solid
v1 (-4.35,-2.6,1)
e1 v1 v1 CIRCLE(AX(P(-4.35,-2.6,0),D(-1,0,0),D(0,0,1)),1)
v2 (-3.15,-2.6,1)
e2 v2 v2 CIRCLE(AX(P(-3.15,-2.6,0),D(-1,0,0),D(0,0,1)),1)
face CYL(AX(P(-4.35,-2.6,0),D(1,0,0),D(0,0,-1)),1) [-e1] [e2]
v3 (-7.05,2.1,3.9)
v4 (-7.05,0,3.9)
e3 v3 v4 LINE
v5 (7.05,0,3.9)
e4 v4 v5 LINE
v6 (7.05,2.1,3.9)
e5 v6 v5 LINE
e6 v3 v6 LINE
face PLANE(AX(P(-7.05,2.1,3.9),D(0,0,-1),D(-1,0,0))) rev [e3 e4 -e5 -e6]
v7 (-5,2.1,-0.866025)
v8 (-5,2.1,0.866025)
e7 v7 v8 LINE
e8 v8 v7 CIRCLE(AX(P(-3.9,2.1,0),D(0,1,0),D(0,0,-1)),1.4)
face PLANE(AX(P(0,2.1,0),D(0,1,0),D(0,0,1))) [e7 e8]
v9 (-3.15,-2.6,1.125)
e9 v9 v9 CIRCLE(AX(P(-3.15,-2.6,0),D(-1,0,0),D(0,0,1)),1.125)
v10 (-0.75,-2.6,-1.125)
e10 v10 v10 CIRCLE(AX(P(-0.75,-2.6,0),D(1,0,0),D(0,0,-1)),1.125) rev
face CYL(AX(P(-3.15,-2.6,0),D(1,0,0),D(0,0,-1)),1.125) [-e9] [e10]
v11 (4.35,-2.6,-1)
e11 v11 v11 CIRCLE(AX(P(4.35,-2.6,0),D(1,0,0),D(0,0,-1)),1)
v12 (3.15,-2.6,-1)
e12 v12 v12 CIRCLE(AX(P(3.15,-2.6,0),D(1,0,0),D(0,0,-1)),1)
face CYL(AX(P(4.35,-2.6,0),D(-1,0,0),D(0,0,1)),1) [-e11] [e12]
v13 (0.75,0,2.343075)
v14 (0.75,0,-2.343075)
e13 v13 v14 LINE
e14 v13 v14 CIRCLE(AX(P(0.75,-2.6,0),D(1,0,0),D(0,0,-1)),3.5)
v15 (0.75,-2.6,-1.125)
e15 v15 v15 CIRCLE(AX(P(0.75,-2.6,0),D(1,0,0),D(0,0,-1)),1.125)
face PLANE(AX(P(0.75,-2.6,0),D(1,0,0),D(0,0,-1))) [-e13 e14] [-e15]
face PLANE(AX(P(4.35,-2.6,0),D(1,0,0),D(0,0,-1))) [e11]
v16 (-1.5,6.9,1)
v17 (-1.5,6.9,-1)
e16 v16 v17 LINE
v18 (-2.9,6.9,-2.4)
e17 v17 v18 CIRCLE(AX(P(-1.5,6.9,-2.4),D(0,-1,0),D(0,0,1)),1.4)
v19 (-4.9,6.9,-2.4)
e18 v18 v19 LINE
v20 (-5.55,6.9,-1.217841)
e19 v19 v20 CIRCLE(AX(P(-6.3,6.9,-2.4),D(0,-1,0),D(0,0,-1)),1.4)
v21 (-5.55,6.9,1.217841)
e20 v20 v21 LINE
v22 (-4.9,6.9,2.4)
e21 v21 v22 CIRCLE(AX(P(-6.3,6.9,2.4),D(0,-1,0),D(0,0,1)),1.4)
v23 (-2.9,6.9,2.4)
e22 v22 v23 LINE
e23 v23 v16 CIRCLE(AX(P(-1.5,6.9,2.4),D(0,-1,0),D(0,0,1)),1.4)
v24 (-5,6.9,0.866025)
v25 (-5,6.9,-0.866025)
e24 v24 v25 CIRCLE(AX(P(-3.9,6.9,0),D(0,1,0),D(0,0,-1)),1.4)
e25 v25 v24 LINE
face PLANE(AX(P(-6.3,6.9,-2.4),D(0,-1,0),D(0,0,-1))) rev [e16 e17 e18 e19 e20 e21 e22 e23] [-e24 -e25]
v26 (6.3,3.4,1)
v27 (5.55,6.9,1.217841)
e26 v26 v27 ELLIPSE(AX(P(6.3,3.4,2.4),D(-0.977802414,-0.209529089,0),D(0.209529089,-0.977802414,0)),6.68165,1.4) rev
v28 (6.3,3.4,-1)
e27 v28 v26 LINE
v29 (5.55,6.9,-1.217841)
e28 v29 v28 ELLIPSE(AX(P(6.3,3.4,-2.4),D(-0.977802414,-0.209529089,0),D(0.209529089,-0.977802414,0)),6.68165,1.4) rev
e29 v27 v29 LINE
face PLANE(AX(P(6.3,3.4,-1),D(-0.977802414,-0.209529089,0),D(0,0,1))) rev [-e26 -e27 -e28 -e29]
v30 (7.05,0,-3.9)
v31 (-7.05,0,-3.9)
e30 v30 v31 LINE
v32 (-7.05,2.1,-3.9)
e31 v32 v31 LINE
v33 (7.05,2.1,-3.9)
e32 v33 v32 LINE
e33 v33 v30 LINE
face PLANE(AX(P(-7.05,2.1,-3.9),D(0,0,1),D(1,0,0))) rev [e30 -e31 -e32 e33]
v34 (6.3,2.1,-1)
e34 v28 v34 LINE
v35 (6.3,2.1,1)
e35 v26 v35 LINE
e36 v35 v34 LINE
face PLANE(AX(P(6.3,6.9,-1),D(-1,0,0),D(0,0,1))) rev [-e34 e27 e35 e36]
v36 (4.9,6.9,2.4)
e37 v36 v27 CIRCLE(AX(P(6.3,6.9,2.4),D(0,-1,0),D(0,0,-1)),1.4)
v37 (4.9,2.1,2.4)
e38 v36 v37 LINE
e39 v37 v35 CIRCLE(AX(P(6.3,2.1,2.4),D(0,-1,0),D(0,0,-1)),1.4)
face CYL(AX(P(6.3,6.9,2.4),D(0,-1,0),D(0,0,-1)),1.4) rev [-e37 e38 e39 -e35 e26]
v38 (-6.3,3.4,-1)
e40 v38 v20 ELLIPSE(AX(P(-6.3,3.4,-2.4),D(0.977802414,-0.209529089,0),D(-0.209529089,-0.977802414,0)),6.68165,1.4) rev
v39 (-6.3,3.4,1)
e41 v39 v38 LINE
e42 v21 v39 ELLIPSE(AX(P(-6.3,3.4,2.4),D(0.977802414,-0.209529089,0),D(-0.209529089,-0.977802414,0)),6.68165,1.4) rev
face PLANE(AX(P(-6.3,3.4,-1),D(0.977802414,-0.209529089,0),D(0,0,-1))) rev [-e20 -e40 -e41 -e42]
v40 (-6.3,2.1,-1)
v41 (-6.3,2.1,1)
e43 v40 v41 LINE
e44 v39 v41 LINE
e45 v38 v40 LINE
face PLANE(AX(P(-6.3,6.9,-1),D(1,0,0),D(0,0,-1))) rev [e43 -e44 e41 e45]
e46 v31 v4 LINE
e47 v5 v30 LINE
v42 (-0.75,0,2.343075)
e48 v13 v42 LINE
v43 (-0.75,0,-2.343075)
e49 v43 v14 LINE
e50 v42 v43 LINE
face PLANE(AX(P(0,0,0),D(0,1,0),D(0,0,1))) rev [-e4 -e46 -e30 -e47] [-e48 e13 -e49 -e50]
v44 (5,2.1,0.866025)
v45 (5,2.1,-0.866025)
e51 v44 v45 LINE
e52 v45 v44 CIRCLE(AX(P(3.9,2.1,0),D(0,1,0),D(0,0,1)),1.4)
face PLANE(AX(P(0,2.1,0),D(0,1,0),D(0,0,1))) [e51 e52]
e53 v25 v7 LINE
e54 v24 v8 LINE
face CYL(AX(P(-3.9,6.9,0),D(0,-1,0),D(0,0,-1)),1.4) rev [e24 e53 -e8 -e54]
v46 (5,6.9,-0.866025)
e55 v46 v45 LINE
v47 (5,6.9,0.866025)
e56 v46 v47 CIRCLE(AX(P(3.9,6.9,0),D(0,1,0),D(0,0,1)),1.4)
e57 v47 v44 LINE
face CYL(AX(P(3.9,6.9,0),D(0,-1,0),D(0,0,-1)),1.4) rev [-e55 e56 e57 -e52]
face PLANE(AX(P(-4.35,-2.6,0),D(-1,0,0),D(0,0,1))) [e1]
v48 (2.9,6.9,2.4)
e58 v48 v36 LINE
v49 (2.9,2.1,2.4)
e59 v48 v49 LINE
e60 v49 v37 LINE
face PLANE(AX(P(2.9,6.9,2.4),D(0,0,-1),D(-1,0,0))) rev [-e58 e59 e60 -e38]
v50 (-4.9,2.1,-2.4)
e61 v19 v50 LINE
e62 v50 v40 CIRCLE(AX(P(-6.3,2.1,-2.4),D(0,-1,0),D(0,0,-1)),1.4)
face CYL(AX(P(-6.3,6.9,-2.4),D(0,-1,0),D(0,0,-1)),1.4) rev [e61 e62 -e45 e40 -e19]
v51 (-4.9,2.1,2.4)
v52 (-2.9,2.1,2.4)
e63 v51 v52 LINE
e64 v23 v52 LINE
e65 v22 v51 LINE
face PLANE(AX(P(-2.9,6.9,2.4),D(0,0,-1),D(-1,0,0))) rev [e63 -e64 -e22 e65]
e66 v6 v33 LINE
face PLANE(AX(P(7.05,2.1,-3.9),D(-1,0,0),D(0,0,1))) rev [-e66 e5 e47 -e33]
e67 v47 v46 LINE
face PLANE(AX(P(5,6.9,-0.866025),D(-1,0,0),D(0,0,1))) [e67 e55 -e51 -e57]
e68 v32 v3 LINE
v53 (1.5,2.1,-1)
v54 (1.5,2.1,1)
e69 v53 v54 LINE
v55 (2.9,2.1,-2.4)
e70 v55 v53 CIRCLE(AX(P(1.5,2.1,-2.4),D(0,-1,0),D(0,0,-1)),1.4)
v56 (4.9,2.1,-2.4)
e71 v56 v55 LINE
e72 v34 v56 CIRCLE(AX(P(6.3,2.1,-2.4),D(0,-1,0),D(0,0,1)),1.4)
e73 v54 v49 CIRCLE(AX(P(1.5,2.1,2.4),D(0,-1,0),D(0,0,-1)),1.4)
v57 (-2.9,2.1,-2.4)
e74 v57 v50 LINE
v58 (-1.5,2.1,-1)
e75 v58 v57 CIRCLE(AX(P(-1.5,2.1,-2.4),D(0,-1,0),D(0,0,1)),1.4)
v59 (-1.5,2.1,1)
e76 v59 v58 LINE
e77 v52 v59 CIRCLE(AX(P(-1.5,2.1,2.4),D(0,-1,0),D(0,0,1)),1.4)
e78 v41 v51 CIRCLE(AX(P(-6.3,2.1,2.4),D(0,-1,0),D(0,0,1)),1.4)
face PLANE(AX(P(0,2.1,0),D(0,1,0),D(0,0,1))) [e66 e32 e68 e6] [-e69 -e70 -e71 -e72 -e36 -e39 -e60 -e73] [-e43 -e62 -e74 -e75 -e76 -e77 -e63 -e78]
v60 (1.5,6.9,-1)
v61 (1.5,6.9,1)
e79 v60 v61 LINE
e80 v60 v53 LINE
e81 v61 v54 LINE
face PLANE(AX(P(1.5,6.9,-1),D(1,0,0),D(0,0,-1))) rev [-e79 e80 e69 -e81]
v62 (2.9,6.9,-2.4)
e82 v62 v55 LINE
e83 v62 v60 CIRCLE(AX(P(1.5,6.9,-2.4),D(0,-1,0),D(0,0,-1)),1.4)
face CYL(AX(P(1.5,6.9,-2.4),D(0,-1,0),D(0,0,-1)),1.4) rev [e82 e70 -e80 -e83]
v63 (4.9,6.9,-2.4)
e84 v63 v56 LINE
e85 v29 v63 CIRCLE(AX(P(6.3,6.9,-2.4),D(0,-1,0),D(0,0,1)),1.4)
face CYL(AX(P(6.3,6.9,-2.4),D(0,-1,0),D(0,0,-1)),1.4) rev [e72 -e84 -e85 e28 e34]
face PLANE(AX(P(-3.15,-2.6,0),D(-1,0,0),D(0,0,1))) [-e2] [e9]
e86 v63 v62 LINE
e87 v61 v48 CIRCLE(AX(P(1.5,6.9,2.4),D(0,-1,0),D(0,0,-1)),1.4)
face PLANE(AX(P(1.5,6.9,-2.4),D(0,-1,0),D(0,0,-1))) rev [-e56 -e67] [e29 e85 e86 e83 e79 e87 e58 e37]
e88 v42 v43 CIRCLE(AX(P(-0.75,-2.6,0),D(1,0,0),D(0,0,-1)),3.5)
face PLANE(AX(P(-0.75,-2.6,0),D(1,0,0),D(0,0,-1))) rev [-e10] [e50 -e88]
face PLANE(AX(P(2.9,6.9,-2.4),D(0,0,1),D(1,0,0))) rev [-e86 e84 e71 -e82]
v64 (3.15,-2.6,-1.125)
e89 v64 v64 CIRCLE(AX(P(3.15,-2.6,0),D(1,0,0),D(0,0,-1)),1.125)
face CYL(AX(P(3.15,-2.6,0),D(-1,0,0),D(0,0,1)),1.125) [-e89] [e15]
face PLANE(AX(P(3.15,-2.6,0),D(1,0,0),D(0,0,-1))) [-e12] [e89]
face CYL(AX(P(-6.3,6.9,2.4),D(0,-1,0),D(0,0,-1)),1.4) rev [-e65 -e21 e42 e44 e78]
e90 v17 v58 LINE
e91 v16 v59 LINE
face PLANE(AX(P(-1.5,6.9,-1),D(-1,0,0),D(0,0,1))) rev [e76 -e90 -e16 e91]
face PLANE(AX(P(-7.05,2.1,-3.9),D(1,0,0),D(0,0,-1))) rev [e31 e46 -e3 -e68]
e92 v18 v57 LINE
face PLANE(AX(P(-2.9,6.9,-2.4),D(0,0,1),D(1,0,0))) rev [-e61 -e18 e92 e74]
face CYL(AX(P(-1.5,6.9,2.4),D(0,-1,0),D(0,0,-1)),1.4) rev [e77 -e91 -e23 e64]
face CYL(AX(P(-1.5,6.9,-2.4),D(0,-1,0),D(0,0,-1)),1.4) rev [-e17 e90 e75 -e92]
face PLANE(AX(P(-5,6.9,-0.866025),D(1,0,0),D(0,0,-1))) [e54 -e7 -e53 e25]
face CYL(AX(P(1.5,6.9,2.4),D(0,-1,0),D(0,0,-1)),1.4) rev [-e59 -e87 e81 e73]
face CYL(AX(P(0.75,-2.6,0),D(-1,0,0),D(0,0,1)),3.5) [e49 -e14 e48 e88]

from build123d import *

# Parameters (mm, degrees)
SKETCH1_W           = 14.1
SKETCH1_H           = 7.8
BOSS_EXTRUDE3_DEPTH = 2.1
BOSS_EXTRUDE4_DEPTH = 4.8
CHAMFER1_START      = 6.87255411
CHAMFER1_OUTLINE_W  = 6
CHAMFER1_OUTLINE_H  = 6
CHAMFER1_DEPTH      = 2.12744589
CHAMFER2_START      = -9
CHAMFER2_OUTLINE_W  = 6
CHAMFER2_OUTLINE_H  = 6
CHAMFER2_DEPTH      = 2.12744589
SKETCH6_R           = 3.5
BOSS_EXTRUDE5_DEPTH = 0.75
SKETCH7_R           = 1.125
BOSS_EXTRUDE6_DEPTH = 2.4
BOSS_EXTRUDE7_START = 2.4
SKETCH9_R           = 1.125
BOSS_EXTRUDE7_DEPTH = 2.4
SKETCH10_R          = 1
BOSS_EXTRUDE8_DEPTH = 1.2
BOSS_EXTRUDE9_START = 1.2
SKETCH11_R          = 1
BOSS_EXTRUDE9_DEPTH = 1.2


with BuildPart() as part:
    # Sketch1 → Boss-Extrude3 (new body)
    with BuildSketch(Plane(origin=(0, 0, 0), x_dir=(1, 0, 0), z_dir=(0, 1, 0))):
        Rectangle(SKETCH1_W, SKETCH1_H)
    extrude(amount=BOSS_EXTRUDE3_DEPTH)

    # Sketch3 → Boss-Extrude4 (add)
    # profile 1 of 2: a face of its own
    with BuildSketch(Plane(origin=(0, 2.1, 0), x_dir=(1, 0, 0), z_dir=(0, 1, 0))):
        with BuildLine():
            Line((2.9, 2.4), (4.9, 2.4))
            ThreePointArc((4.9, 2.4), (5.310050506, 1.410050506), (6.3, 1))
            Line((6.3, 1), (6.3, -1))
            ThreePointArc((6.3, -1), (5.310050506, -1.410050506), (4.9, -2.4))
            Line((4.9, -2.4), (2.9, -2.4))
            ThreePointArc((2.9, -2.4), (2.489949494, -1.410050506), (1.5, -1))
            Line((1.5, -1), (1.5, 1))
            ThreePointArc((1.5, 1), (2.489949494, 1.410050506), (2.9, 2.4))
        make_face()
        with BuildLine():
            Line((5, 0.866025404), (5, -0.866025404))
            ThreePointArc((5, -0.866025404), (2.5, 0), (5, 0.866025404))
        make_face(mode=Mode.SUBTRACT)
    # profile 2 of 2: a face of its own
    with BuildSketch(Plane(origin=(0, 2.1, 0), x_dir=(1, 0, 0), z_dir=(0, 1, 0))):
        with BuildLine():
            Line((-6.3, 1), (-6.3, -1))
            ThreePointArc((-6.3, -1), (-5.310050506, -1.410050506), (-4.9, -2.4))
            Line((-4.9, -2.4), (-2.9, -2.4))
            ThreePointArc((-2.9, -2.4), (-2.489949494, -1.410050506), (-1.5, -1))
            Line((-1.5, -1), (-1.5, 1))
            ThreePointArc((-1.5, 1), (-2.489949494, 1.410050506), (-2.9, 2.4))
            Line((-2.9, 2.4), (-4.9, 2.4))
            ThreePointArc((-4.9, 2.4), (-5.310050506, 1.410050506), (-6.3, 1))
        make_face()
        with BuildLine():
            Line((-5, 0.866025404), (-5, -0.866025404))
            ThreePointArc((-5, -0.866025404), (-2.5, 0), (-5, 0.866025404))
        make_face(mode=Mode.SUBTRACT)
    extrude(amount=BOSS_EXTRUDE4_DEPTH)

    # Chamfer1: read off the stored shape, not the designer's step
    # Chamfer1 outline → Chamfer1 (cut)
    with BuildSketch(Plane(origin=(0, 0, 0), x_dir=(-0.20952908873087314, 0.9778024140774096, 0), z_dir=(0.9778024140774096, 0.20952908873087314, 0)).offset(CHAMFER1_START)):
        with Locations((4, 0)):
            Rectangle(CHAMFER1_OUTLINE_W, CHAMFER1_OUTLINE_H)
    extrude(amount=CHAMFER1_DEPTH, mode=Mode.SUBTRACT)

    # Chamfer2: read off the stored shape, not the designer's step
    # Chamfer2 outline → Chamfer2 (cut)
    with BuildSketch(Plane(origin=(0, 0, 0), x_dir=(0.20952908873087314, 0.9778024140774096, 0), z_dir=(0.9778024140774096, -0.20952908873087314, 0)).offset(CHAMFER2_START)):
        with Locations((4, 0)):
            Rectangle(CHAMFER2_OUTLINE_W, CHAMFER2_OUTLINE_H)
    extrude(amount=CHAMFER2_DEPTH, mode=Mode.SUBTRACT)

    # Sketch6 → Boss-Extrude5 (add, symmetric)
    with BuildSketch(Plane(origin=(0, 0, 0), x_dir=(0, 0, -1), z_dir=(1, 0, 0))):
        with Locations((0, -2.6)):
            Circle(SKETCH6_R)
    extrude(amount=BOSS_EXTRUDE5_DEPTH, both=True)

    # Sketch7 → Boss-Extrude6 (add)
    with BuildSketch(Plane(origin=(0.75, 0, 0), x_dir=(0, 0, -1), z_dir=(1, 0, 0))):
        with Locations((0, -2.6)):
            Circle(SKETCH7_R)
    extrude(amount=BOSS_EXTRUDE6_DEPTH)

    # Sketch9 → Boss-Extrude7 (add)
    with BuildSketch(Plane.ZY.offset(0.75).offset(BOSS_EXTRUDE7_START)):
        with Locations(Location((0, -2.6, 0), (0, 0, 180))):
            Circle(SKETCH9_R)
    extrude(amount=-BOSS_EXTRUDE7_DEPTH)

    # Sketch10 → Boss-Extrude8 (add)
    with BuildSketch(Plane.ZY.offset(3.15)):
        with Locations((0, -2.6)):
            Circle(SKETCH10_R)
    extrude(amount=BOSS_EXTRUDE8_DEPTH)

    # Sketch11 → Boss-Extrude9 (add)
    with BuildSketch(Plane(origin=(3.15, 0, 0), x_dir=(0, 0, -1), z_dir=(1, 0, 0)).offset(BOSS_EXTRUDE9_START)):
        with Locations(Location((0, -2.6, 0), (0, 0, 180))):
            Circle(SKETCH11_R)
    extrude(amount=-BOSS_EXTRUDE9_DEPTH)


solid = part.part
